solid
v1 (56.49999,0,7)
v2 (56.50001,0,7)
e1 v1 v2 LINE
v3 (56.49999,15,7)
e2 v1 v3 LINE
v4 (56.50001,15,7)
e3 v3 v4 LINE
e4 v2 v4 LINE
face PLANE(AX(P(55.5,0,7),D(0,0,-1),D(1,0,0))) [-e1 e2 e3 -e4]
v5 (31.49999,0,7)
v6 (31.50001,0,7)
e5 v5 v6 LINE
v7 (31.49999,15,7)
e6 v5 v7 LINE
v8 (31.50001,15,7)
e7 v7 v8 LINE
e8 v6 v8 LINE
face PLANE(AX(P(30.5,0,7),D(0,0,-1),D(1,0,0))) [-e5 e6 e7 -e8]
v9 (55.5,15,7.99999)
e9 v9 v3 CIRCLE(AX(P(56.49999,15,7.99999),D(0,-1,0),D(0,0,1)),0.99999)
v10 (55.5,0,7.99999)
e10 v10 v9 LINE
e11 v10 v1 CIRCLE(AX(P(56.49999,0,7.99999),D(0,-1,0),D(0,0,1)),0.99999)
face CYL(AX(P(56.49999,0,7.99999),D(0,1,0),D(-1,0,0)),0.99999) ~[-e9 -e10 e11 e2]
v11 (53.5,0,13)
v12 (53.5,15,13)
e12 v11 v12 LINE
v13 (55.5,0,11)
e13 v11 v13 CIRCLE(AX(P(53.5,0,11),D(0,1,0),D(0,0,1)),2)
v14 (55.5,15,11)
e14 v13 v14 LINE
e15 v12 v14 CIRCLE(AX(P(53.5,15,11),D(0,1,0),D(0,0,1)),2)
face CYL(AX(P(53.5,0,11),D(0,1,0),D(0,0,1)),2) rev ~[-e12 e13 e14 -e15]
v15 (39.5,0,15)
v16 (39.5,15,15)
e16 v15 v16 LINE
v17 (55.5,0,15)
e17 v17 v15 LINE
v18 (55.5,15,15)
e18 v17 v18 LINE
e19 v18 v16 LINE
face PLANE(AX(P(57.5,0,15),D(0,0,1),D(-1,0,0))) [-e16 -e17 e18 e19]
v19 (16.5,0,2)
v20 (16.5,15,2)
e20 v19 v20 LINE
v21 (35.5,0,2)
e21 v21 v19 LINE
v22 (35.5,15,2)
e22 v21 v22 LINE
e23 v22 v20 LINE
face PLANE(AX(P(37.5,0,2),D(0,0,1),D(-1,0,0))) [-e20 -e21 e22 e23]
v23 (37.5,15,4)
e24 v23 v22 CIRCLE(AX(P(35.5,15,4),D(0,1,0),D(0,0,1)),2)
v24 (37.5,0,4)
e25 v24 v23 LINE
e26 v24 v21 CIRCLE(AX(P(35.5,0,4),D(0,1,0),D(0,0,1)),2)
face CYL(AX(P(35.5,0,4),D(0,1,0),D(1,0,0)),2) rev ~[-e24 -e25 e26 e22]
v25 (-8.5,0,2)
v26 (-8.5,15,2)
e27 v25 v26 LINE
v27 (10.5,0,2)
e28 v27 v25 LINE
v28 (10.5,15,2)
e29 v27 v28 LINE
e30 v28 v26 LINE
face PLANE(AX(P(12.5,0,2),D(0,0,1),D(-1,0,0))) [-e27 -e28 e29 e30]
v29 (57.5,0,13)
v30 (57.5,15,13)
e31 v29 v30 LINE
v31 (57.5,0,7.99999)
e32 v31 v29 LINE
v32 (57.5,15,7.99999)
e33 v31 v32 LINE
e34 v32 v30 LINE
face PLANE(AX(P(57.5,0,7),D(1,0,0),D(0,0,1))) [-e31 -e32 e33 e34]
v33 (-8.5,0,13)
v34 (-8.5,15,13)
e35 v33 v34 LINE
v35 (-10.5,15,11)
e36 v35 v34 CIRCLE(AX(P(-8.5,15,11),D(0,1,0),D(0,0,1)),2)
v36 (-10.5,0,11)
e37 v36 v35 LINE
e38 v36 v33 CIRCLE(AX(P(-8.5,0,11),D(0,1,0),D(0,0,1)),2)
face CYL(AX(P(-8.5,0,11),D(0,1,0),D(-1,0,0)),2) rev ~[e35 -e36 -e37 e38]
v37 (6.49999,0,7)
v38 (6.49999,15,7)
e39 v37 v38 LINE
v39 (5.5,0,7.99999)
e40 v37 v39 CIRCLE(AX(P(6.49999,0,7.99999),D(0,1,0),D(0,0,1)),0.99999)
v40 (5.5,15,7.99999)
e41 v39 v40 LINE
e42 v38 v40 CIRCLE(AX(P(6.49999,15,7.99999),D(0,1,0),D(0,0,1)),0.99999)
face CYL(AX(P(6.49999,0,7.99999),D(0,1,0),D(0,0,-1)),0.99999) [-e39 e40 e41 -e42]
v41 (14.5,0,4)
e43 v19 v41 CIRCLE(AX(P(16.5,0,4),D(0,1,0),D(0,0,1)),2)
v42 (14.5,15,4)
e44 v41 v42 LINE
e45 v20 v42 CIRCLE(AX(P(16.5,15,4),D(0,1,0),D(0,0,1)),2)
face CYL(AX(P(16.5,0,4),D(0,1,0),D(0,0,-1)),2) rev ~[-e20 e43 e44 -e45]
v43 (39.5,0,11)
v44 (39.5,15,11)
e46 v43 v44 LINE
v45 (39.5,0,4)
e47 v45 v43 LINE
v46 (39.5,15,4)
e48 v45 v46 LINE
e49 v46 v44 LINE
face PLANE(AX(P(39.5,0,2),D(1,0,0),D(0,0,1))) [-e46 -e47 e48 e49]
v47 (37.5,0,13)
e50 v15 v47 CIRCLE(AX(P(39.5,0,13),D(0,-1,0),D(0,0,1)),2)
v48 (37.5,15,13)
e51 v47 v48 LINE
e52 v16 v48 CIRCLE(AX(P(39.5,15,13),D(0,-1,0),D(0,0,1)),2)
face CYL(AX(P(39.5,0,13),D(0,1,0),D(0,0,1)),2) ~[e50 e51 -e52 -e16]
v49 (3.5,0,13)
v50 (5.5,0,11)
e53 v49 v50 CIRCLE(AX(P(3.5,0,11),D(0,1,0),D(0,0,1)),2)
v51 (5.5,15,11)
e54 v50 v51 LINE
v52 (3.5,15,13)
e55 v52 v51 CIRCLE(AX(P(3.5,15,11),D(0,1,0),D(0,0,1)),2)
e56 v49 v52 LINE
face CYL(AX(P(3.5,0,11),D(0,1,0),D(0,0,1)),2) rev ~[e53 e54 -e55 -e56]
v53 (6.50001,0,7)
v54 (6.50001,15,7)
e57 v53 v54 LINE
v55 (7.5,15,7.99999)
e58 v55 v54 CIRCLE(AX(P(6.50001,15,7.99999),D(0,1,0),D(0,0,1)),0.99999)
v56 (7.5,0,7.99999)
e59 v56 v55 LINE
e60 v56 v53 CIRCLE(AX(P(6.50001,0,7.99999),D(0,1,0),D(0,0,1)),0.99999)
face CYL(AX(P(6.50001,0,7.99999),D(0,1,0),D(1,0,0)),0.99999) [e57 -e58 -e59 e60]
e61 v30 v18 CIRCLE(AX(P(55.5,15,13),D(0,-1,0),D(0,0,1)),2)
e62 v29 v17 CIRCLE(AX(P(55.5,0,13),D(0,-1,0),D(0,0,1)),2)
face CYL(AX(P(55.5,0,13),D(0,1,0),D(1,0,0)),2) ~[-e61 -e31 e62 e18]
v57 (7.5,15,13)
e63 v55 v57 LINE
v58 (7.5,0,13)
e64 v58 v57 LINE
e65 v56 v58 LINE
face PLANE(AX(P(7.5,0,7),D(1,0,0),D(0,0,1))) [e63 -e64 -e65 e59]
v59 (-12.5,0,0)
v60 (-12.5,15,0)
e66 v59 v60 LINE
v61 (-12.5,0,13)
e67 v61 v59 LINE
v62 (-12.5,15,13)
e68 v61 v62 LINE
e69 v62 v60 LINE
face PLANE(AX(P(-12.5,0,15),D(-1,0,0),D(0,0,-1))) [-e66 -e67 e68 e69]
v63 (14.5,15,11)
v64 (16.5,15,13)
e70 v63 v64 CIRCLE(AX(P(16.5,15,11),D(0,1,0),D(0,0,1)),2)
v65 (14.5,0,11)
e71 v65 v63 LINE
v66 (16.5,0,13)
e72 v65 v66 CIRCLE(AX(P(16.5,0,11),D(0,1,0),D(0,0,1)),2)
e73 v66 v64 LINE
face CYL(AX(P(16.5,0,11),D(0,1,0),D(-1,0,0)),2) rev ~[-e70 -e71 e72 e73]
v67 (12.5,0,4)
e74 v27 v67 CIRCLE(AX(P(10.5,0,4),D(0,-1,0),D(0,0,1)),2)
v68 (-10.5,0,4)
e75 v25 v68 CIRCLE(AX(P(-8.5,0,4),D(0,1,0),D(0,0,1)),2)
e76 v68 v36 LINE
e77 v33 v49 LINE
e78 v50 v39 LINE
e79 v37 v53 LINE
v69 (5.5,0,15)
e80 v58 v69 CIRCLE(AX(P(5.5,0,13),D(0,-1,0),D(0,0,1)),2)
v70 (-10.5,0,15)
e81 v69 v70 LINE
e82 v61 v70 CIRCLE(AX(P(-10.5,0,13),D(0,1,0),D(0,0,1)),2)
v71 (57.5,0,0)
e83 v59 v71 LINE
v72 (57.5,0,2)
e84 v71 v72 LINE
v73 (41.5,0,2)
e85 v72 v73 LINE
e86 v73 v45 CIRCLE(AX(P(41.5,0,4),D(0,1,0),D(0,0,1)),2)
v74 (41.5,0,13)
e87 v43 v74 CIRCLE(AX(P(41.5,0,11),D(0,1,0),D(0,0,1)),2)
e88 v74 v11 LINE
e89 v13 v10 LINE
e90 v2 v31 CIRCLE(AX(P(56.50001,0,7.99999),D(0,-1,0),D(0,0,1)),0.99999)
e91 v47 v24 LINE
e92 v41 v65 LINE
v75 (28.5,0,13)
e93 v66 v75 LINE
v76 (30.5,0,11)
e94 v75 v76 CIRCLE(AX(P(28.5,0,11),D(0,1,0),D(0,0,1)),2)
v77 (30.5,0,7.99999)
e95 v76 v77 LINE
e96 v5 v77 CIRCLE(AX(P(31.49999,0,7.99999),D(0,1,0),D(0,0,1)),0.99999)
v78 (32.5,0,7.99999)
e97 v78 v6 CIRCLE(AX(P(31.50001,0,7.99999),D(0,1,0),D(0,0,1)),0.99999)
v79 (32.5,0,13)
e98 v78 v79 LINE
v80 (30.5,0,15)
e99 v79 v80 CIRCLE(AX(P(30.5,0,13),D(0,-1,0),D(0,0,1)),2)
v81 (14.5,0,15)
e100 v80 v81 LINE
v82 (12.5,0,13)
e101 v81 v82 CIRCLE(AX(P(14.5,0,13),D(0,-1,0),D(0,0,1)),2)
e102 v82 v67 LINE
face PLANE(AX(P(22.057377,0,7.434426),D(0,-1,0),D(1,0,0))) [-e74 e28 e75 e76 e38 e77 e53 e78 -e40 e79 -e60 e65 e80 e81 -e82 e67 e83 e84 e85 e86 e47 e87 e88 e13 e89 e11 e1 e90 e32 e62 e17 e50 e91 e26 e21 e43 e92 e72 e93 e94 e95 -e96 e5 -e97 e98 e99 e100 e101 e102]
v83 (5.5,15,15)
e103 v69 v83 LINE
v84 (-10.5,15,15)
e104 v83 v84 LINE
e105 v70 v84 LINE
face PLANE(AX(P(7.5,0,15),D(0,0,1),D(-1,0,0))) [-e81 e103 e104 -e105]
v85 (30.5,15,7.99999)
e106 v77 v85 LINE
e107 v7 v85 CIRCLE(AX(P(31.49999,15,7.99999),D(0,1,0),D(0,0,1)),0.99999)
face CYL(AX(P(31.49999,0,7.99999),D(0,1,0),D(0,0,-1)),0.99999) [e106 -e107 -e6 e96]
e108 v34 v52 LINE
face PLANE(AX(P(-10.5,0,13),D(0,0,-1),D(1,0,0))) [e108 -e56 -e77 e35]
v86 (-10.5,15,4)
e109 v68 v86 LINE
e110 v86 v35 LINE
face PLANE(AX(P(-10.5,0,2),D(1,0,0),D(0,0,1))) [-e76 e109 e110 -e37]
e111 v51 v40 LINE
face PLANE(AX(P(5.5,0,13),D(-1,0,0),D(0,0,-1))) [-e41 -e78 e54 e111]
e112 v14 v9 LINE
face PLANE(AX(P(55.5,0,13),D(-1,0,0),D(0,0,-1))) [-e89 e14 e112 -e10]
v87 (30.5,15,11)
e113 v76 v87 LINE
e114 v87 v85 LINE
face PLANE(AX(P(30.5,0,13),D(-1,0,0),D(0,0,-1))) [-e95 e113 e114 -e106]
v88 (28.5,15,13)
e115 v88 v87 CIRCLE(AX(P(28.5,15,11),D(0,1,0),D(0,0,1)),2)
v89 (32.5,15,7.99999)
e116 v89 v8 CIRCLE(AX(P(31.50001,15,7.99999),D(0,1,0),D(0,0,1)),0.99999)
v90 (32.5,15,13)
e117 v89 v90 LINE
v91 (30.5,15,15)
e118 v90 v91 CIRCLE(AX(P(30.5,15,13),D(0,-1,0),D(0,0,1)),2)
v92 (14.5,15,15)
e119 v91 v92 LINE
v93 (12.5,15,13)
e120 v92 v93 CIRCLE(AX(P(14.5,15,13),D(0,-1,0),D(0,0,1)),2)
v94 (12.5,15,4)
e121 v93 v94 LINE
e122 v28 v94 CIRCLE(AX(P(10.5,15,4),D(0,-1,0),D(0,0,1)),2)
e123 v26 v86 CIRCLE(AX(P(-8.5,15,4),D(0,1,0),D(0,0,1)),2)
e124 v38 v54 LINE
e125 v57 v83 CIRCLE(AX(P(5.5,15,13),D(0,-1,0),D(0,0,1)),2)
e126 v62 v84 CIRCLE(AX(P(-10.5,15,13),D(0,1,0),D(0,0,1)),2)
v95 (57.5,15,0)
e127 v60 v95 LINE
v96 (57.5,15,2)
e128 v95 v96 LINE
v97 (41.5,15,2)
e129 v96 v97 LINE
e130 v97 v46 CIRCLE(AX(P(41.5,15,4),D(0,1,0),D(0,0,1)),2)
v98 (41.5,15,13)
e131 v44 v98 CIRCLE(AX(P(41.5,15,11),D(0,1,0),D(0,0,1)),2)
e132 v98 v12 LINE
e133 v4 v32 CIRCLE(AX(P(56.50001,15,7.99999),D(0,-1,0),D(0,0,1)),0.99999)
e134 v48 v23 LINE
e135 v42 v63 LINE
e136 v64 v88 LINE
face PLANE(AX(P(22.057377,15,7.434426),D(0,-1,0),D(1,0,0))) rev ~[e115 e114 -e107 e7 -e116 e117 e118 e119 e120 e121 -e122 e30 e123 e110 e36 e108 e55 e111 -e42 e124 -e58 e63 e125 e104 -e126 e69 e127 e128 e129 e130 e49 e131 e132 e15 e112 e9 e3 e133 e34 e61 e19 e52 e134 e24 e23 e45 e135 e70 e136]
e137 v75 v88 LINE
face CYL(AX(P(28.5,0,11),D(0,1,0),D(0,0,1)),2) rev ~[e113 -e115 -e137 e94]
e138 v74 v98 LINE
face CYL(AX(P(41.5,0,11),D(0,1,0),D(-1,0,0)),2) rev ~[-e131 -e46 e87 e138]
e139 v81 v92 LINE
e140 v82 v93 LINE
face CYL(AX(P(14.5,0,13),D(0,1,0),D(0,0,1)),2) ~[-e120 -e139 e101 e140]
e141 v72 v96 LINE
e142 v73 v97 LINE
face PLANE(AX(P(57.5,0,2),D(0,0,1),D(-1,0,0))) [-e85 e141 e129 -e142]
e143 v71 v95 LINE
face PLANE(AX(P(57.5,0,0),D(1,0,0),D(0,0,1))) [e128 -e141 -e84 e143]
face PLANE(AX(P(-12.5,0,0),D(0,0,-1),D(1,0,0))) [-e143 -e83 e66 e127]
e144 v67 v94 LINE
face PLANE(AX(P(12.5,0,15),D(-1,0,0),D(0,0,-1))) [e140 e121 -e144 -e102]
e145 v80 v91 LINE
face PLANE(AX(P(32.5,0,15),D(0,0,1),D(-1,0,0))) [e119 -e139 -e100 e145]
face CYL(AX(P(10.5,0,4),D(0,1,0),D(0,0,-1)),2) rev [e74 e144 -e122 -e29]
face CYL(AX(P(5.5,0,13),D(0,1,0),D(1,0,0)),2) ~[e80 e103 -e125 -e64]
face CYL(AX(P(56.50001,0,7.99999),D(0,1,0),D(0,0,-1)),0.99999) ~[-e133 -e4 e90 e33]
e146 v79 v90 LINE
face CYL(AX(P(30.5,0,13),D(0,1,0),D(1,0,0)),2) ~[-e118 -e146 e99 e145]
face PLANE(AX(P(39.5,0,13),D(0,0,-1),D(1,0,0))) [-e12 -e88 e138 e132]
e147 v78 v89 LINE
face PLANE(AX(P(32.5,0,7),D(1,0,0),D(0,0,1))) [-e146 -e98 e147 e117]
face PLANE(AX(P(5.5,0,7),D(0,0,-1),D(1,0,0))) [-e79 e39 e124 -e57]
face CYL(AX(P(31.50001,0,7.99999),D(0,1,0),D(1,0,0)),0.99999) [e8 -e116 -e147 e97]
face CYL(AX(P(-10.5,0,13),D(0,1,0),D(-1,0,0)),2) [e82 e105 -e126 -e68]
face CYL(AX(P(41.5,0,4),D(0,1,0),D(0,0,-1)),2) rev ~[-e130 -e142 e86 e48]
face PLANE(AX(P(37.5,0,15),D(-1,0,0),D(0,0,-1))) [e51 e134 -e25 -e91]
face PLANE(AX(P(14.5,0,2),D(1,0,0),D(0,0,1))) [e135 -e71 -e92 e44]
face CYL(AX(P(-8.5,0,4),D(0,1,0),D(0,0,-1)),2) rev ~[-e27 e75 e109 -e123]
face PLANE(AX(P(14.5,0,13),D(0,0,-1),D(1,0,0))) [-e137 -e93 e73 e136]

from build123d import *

# Parameters (mm, degrees)
F1_DEPTH = 15
F2_R     = 2
F3_R     = 0.99999
F4_R     = 2


# Not quite as in the source:
# - a fillet or chamfer is up to 0.001 mm smaller than in the source, because OpenCascade refuses the exact size


with BuildPart() as f1:
    # F0 (on Front) → F1 (new body)
    with BuildSketch(Plane.XZ):
        Polygon((-12.5, 15), (-12.5, 0), (57.5, 0), (57.5, 2), (39.5, 2), (39.5, 13), (55.5, 13), (55.5, 7), (57.5, 7), (57.5, 15), (37.5, 15), (37.5, 2), (14.5, 2), (14.5, 13), (30.5, 13), (30.5, 7), (32.5, 7), (32.5, 15), (12.5, 15), (12.5, 2), (-10.5, 2), (-10.5, 13), (5.5, 13), (5.5, 7), (7.5, 7), (7.5, 15), align=None)
    extrude(amount=-F1_DEPTH)

    # F2
    f2_edges = [f1.edges().sort_by_distance(p)[0] for p in [
        (-10.5, 7.5, 2),
        (14.5, 7.5, 2),
        (39.5, 7.5, 2),
        (-10.5, 7.5, 13),
        (14.5, 7.5, 13),
        (39.5, 7.5, 13),
        (37.5, 7.5, 15),
        (12.5, 7.5, 15),
        (-12.5, 7.5, 15),
        (7.5, 7.5, 15),
        (32.5, 7.5, 15),
        (57.5, 7.5, 15),
        (5.5, 7.5, 13),
        (30.5, 7.5, 13),
        (55.5, 7.5, 13),
    ]]
    fillet(f2_edges, radius=F2_R)

    # F3 (radius 1 in the source; OpenCascade refuses exactly that, so slightly less here)
    f3_edges = [f1.edges().sort_by_distance(p)[0] for p in [
        (7.5, 7.5, 7),
        (5.5, 7.5, 7),
        (32.5, 7.5, 7),
        (30.5, 7.5, 7),
        (57.5, 7.5, 7),
        (55.5, 7.5, 7),
    ]]
    fillet(f3_edges, radius=F3_R)

    # F4
    f4_edges = [f1.edges().sort_by_distance(p)[0] for p in [
        (12.5, 7.5, 2),
        (37.5, 7.5, 2),
    ]]
    fillet(f4_edges, radius=F4_R)


solid = f1.part
